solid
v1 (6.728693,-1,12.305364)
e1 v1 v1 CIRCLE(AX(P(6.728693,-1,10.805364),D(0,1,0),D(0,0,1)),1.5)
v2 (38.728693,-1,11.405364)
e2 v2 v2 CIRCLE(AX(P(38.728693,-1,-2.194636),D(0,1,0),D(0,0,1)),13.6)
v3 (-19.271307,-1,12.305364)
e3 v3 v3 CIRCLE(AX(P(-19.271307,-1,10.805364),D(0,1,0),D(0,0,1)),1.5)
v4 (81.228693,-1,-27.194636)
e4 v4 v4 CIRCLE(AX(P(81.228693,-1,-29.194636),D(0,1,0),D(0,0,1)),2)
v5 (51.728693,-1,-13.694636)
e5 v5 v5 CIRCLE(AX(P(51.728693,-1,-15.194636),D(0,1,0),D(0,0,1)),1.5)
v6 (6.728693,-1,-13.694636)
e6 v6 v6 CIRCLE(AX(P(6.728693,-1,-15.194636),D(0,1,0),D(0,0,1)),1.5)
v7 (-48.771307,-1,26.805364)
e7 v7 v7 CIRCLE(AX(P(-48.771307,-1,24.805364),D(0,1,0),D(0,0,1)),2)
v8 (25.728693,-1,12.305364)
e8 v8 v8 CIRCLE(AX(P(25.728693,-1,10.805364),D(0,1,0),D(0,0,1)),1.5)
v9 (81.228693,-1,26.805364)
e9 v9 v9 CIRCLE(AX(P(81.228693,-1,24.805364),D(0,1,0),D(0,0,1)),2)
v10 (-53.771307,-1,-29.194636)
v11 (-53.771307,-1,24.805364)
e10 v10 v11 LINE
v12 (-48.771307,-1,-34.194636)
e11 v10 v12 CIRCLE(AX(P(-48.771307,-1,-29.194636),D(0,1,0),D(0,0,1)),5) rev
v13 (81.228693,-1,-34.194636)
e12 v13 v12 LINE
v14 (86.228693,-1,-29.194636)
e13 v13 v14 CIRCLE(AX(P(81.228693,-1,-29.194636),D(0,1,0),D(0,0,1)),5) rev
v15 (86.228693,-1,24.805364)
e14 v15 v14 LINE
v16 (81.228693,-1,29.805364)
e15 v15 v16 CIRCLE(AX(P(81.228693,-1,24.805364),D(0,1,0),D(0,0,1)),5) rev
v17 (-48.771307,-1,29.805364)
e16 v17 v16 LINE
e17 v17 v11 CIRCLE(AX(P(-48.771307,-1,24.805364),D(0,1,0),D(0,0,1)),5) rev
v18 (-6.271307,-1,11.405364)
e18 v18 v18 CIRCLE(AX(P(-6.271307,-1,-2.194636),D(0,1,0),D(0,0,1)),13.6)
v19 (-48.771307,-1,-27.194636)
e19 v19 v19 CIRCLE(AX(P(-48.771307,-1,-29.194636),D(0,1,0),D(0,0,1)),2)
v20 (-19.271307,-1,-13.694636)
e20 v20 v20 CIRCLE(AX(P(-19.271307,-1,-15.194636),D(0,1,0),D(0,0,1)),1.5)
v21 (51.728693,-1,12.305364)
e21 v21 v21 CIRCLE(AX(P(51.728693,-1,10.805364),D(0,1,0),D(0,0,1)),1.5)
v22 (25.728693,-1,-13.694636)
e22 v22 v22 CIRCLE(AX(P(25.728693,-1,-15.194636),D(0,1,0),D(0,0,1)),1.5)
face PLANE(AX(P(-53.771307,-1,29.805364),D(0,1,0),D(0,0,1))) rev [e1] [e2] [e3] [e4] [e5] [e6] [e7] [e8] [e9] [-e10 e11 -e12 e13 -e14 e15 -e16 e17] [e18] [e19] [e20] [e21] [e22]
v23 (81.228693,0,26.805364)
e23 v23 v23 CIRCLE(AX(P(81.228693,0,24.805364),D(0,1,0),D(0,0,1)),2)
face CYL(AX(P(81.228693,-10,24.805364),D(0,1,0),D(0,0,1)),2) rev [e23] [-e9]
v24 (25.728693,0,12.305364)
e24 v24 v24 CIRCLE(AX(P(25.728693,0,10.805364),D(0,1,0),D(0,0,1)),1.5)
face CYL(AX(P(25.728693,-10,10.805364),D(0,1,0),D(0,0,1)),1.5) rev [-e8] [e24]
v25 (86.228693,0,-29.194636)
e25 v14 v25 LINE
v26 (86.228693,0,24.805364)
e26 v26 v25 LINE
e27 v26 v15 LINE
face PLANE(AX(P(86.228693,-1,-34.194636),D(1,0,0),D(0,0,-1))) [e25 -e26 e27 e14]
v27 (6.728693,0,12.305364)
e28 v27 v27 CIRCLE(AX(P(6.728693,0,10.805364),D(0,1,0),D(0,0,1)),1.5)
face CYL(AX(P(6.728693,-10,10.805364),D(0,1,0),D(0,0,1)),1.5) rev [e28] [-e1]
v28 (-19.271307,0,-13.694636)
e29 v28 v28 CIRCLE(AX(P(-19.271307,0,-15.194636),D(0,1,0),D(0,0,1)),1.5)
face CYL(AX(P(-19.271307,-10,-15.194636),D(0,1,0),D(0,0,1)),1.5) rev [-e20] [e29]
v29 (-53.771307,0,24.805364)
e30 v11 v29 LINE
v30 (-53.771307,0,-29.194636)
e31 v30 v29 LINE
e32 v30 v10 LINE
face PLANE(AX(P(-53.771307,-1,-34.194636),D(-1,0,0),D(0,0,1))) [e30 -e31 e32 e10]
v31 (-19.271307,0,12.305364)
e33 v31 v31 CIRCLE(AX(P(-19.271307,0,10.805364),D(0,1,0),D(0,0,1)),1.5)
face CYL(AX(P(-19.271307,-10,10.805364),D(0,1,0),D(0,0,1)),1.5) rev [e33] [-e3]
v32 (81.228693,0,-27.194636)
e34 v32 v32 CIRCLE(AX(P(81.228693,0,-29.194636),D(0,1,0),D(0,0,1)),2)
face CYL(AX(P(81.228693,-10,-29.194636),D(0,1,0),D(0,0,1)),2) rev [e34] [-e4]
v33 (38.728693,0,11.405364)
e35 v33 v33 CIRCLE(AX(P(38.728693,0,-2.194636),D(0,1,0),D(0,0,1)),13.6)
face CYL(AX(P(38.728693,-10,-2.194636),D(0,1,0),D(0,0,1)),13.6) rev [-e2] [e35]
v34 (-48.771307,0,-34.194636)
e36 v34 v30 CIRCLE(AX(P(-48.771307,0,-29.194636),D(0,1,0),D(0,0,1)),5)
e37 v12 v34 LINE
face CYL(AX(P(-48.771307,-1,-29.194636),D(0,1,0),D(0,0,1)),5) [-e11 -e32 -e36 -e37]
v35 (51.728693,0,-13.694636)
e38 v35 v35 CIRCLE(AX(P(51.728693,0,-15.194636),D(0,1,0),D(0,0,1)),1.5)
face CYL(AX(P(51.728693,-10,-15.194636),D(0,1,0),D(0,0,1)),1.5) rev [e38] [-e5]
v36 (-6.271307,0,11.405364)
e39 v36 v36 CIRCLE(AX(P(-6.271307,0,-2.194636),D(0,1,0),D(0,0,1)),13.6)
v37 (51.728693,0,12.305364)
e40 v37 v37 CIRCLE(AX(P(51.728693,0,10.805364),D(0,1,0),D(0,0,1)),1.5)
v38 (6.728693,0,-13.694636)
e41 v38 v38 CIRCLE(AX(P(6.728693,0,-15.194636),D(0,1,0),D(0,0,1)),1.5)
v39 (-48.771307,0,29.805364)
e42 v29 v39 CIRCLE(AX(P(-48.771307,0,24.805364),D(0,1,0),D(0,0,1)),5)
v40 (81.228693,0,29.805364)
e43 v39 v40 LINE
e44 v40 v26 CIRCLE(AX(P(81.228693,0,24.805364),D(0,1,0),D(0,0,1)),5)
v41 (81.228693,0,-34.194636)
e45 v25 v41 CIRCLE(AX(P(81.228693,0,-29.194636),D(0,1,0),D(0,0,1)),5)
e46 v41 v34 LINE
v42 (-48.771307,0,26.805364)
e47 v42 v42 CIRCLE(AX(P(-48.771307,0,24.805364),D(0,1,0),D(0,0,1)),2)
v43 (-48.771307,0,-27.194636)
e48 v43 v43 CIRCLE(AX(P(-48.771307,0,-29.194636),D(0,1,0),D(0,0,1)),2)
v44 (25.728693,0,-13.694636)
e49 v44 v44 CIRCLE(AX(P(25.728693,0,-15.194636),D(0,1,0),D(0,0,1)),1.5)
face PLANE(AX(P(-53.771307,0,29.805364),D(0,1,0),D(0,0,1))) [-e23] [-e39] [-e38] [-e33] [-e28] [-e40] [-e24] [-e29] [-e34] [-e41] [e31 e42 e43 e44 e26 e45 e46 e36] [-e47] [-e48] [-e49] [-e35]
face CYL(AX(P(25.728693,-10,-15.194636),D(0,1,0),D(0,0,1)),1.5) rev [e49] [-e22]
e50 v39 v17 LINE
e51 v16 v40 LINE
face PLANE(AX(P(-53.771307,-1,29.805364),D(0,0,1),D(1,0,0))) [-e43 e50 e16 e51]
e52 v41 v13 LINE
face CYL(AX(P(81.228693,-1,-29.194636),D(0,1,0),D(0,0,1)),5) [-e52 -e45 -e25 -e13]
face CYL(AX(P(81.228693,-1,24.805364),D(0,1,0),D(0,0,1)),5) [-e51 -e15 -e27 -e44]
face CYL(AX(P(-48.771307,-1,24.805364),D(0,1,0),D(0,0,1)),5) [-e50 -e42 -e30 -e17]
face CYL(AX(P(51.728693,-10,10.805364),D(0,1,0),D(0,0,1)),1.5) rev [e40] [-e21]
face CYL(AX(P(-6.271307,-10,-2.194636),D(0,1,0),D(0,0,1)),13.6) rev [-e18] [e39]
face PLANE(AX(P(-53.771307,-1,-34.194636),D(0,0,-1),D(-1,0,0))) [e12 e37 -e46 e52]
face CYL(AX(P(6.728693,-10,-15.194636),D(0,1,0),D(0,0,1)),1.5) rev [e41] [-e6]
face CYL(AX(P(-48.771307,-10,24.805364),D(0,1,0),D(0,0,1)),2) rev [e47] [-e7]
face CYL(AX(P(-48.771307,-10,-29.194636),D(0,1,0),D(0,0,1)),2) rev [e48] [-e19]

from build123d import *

# Parameters (mm, degrees)
SKETCH_1_W             = 140
SKETCH_1_H             = 64
SM_BASE_FLANGE_1_DEPTH = 1
FILLET_1_R             = 5
SKETCH_4_R             = 2
CUT_EXTRUDE_2_DEPTH    = 10
SKETCH_5_R             = 13.6
SKETCH_5_R_2           = 1.5
CUT_EXTRUDE_3_DEPTH    = 10


# Sheet-metal steps are written as plain solids
with BuildPart() as part:
    # Sketch 1 → Базовая кромка1 (new body)
    with BuildSketch(Plane(origin=(0, 0, 0), x_dir=(1, 0, 0), z_dir=(0, 1, 0))):
        with Locations((16.228693113, 2.194635649)):
            Rectangle(SKETCH_1_W, SKETCH_1_H)
    extrude(amount=-SM_BASE_FLANGE_1_DEPTH)

    # Скругление1
    fillet_1_edges = [part.edges().sort_by_distance(p)[0] for p in [
        (-53.771306887, -0.5, -34.194635649),
        (86.228693113, -0.5, -34.194635649),
        (86.228693113, -0.5, 29.805364351),
        (-53.771306887, -0.5, 29.805364351),
    ]]
    fillet(fillet_1_edges, radius=FILLET_1_R)

    # Эскиз4 → Вырез-Вытянуть2 (cut)
    with BuildSketch(Plane(origin=(0, 0, 0), x_dir=(1, 0, 0), z_dir=(0, 1, 0))):
        with Locations(Location((-48.771306887, 29.194635649, 0), (0, 0, 270))):
            Circle(SKETCH_4_R)
        with Locations(Location((81.228693113, 29.194635649, 0), (0, 0, 270))):
            Circle(SKETCH_4_R)
        with Locations(Location((-48.771306887, -24.805364351, 0), (0, 0, 270))):
            Circle(SKETCH_4_R)
        with Locations(Location((81.228693113, -24.805364351, 0), (0, 0, 270))):
            Circle(SKETCH_4_R)
    extrude(amount=-CUT_EXTRUDE_2_DEPTH, mode=Mode.SUBTRACT)

    # Эскиз5 → Вырез-Вытянуть3 (cut)
    with BuildSketch(Plane(origin=(0, 0, 0), x_dir=(1, 0, 0), z_dir=(0, 1, 0))):
        with Locations(Location((-6.271306887, 2.194635649, 0), (0, 0, 270))):
            Circle(SKETCH_5_R)
        with Locations(Location((38.728693113, 2.194635649, 0), (0, 0, 270))):
            Circle(SKETCH_5_R)
        with Locations(Location((-19.271306887, 15.194635649, 0), (0, 0, 270))):
            Circle(SKETCH_5_R_2)
        with Locations(Location((6.728693113, 15.194635649, 0), (0, 0, 270))):
            Circle(SKETCH_5_R_2)
        with Locations(Location((-19.271306887, -10.805364351, 0), (0, 0, 270))):
            Circle(SKETCH_5_R_2)
        with Locations(Location((6.728693113, -10.805364351, 0), (0, 0, 270))):
            Circle(SKETCH_5_R_2)
        with Locations(Location((25.728693113, 15.194635649, 0), (0, 0, 270))):
            Circle(SKETCH_5_R_2)
        with Locations(Location((51.728693113, 15.194635649, 0), (0, 0, 270))):
            Circle(SKETCH_5_R_2)
        with Locations(Location((25.728693113, -10.805364351, 0), (0, 0, 270))):
            Circle(SKETCH_5_R_2)
        with Locations(Location((51.728693113, -10.805364351, 0), (0, 0, 270))):
            Circle(SKETCH_5_R_2)
    extrude(amount=-CUT_EXTRUDE_3_DEPTH, mode=Mode.SUBTRACT)


solid = part.part
